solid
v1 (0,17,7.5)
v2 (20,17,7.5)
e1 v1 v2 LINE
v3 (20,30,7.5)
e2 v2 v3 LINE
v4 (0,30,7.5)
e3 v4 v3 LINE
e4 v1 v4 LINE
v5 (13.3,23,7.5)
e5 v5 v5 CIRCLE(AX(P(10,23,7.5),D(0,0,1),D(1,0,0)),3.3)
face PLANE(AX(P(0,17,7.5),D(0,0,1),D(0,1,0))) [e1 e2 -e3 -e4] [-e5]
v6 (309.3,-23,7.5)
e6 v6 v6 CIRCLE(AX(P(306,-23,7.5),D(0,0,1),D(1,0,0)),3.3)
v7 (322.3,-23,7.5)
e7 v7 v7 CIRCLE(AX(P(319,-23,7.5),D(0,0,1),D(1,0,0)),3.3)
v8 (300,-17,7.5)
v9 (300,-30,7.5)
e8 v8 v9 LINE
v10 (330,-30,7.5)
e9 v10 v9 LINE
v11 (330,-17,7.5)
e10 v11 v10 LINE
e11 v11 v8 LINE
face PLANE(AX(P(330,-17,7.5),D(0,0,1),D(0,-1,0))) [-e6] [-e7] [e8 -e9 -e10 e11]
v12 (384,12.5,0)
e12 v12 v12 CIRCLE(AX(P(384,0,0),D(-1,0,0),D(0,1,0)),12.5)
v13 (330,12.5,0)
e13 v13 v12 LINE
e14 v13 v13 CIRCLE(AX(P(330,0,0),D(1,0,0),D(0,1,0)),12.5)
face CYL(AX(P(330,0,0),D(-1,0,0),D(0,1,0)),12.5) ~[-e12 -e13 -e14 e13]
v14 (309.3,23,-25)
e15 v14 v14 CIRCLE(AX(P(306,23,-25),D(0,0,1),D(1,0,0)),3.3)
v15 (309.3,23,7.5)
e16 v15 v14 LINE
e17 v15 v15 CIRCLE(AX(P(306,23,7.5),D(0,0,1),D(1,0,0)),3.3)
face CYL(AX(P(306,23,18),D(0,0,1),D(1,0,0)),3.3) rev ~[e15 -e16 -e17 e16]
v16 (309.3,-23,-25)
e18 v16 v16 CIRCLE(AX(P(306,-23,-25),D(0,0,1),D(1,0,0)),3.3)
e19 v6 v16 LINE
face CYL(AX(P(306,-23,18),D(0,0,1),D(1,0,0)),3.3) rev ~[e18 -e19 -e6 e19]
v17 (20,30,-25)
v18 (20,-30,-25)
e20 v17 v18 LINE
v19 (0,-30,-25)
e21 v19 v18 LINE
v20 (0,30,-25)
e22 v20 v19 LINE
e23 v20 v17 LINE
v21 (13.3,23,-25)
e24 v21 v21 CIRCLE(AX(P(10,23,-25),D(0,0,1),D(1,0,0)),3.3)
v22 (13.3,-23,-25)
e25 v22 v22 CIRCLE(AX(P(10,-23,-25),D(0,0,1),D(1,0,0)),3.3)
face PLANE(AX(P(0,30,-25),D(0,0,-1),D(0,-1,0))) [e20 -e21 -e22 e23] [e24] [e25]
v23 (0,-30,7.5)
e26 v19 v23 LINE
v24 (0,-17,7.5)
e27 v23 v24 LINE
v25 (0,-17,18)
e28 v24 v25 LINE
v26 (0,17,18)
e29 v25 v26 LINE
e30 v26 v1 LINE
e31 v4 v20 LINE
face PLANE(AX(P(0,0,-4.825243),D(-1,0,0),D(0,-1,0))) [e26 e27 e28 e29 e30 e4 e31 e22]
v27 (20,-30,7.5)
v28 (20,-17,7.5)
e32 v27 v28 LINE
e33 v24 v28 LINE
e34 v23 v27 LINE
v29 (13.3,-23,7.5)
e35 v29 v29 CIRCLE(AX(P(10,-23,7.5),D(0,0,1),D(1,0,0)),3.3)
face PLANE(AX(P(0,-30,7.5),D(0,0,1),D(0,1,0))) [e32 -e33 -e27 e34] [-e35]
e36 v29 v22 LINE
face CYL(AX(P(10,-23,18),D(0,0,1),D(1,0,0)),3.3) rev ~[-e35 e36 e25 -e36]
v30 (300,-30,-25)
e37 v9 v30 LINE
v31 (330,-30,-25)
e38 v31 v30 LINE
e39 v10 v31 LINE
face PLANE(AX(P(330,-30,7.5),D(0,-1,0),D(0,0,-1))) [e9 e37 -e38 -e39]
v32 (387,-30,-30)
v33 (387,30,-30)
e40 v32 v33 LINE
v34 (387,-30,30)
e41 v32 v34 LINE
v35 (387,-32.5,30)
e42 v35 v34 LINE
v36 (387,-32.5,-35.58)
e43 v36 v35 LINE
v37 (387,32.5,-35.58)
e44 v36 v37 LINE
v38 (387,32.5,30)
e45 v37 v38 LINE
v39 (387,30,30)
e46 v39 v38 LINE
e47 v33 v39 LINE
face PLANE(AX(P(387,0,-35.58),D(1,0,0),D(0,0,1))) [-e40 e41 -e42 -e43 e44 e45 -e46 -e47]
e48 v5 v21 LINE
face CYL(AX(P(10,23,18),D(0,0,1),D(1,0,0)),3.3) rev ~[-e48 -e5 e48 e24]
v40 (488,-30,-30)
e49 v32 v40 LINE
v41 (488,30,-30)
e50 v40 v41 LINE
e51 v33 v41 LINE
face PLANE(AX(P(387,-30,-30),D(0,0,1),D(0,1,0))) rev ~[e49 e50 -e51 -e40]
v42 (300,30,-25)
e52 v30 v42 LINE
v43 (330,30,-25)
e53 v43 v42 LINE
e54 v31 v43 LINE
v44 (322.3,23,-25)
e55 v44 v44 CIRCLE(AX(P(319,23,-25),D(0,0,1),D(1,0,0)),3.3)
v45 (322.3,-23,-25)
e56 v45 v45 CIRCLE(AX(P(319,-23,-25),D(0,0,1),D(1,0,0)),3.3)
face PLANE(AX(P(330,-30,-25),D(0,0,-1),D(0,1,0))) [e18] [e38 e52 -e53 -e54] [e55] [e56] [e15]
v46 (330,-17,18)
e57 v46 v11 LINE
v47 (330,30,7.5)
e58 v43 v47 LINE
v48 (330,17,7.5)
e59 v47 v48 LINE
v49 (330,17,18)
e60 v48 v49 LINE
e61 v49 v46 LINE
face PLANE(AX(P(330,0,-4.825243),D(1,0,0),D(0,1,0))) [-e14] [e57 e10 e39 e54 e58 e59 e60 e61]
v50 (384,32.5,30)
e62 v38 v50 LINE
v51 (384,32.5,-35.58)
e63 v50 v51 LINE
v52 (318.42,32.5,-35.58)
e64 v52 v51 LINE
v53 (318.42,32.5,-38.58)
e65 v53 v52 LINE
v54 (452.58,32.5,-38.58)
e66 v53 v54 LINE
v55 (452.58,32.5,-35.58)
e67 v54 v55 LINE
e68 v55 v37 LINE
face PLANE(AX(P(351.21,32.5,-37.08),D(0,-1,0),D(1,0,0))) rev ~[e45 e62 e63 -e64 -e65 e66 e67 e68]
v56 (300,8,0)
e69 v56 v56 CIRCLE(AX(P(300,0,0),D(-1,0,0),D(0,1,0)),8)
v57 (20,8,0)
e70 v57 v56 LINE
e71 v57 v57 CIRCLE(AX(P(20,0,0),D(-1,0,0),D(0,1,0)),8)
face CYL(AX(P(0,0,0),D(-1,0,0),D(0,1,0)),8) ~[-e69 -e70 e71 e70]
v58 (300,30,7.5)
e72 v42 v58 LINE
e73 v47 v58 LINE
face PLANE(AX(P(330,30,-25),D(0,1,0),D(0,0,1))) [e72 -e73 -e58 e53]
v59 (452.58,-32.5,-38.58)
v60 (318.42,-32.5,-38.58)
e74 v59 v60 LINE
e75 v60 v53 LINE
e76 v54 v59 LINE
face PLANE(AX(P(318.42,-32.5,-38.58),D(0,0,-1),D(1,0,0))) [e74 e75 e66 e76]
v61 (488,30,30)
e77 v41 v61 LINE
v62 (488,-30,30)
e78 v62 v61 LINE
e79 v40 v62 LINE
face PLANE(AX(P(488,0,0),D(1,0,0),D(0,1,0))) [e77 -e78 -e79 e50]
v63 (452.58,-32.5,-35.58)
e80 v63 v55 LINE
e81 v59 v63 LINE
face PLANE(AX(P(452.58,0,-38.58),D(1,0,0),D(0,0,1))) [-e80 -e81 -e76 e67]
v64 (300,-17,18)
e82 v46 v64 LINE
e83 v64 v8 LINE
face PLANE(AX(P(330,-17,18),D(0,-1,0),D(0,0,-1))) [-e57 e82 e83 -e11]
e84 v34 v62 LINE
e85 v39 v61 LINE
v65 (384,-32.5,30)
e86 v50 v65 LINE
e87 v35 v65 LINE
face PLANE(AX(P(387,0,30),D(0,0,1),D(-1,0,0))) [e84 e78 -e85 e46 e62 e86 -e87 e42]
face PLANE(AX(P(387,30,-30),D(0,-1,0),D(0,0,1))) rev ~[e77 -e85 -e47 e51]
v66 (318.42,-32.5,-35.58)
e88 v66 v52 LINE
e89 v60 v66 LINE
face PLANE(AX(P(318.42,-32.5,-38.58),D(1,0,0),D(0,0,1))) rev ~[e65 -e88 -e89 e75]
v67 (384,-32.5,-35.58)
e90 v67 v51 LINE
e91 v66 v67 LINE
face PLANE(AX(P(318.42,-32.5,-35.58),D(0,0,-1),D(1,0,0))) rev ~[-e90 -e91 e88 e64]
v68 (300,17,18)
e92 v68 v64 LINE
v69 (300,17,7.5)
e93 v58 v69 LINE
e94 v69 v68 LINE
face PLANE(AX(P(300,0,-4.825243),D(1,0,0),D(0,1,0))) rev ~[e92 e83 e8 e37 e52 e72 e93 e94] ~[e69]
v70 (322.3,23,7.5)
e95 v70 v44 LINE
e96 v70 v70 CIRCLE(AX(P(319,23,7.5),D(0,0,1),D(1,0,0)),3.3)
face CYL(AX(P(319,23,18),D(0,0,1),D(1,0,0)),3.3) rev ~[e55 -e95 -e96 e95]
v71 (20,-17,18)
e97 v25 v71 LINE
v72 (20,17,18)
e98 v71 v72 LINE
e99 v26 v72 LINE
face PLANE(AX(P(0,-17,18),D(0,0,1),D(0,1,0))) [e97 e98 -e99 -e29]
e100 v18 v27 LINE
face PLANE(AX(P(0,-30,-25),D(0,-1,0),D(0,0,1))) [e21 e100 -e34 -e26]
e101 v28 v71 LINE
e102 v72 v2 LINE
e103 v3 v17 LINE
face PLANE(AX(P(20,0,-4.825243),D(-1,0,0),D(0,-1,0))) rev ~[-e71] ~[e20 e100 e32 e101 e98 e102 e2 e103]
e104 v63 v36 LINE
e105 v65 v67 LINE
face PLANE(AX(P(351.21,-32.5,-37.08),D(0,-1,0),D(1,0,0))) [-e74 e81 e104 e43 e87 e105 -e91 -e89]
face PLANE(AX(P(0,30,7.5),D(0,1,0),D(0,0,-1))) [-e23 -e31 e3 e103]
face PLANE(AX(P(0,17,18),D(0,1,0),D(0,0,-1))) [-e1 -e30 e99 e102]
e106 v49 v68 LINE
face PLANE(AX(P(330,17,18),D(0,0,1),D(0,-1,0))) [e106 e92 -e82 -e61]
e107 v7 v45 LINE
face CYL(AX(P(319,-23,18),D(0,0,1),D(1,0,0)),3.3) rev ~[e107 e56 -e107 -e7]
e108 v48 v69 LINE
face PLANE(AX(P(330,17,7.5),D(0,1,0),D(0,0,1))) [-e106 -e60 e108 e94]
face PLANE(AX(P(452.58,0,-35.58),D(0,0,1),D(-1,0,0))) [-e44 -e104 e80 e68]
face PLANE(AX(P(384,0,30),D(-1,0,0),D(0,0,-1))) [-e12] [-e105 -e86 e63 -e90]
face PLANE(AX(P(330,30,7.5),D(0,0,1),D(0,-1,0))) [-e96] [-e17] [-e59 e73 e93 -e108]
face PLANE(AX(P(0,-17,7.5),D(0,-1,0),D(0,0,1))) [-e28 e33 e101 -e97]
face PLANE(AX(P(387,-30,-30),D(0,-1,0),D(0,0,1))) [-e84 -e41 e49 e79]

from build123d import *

# Parameters (mm, degrees)
F0_R      = 8
F1_DEPTH  = 330
F3_DEPTH  = 30
F5_DEPTH  = 20
F6_R      = 12.5
F7_DEPTH  = 57
F8_R      = 3.3
F9_DEPTH  = 43.001
F10_W     = 60
F10_H     = 60
F11_DEPTH = 101
F13_DEPTH = 32.5
F14_W     = 65.58
F14_H     = 3
F15_DEPTH = 65


# Not quite as in the source:
# - a feature names something its author has since deleted; it is built from what else it names


with BuildPart() as f1:
    # F0 (on Right) → F1 (new body)
    with BuildSketch(Plane.YZ):
        Circle(F0_R)
    extrude(amount=F1_DEPTH)

    # F2 (on face) → F3 (join)
    with BuildSketch(Plane.YZ.offset(330)):
        Polygon((30, 7.5), (17, 7.5), (17, 18), (-17, 18), (-17, 7.5), (-30, 7.5), (-30, -25), (30, -25), align=None)
    extrude(amount=-F3_DEPTH)

    # F4 (on face) → F5 (join)
    with BuildSketch(Plane(origin=(0, 0, 0), x_dir=(0, -1, 0), z_dir=(-1, 0, 0))):
        Polygon((17, 7.5), (17, 18), (-17, 18), (-17, 7.5), (-30, 7.5), (-30, -25), (30, -25), (30, 7.5), align=None)
    extrude(amount=-F5_DEPTH)

    # F6 (on face) → F7 (join)
    with BuildSketch(Plane.YZ.offset(330)):
        Circle(F6_R)
    extrude(amount=F7_DEPTH)

    # F8 (on face) → F9 (cut, through all)
    with BuildSketch(Plane.XY.offset(18)):
        with Locations((306, 23)):
            Circle(F8_R)
        with Locations((319, 23)):
            Circle(F8_R)
        with Locations((306, -23)):
            Circle(F8_R)
        with Locations((319, -23)):
            Circle(F8_R)
        with Locations((10, 23)):
            Circle(F8_R)
        with Locations((10, -23)):
            Circle(F8_R)
    extrude(amount=-F9_DEPTH, mode=Mode.SUBTRACT)

    # F10 (on face) → F11 (join)
    with BuildSketch(Plane.YZ.offset(387)):
        Rectangle(F10_W, F10_H)
    extrude(amount=F11_DEPTH)

    # F12 (on Front) → F13 (join, symmetric)
    with BuildSketch(Plane.XZ):
        Polygon((387, 30), (384, 30), (384, -38.58), (452.58, -38.58), (452.58, -35.58), (387, -35.58), align=None)
    extrude(amount=F13_DEPTH, both=True)

    # F14 (on face) → F15 (join, through all)
    with BuildSketch(Plane.XZ.offset(32.5)):
        with Locations((351.21, -37.08)):
            Rectangle(F14_W, F14_H)
    extrude(amount=-F15_DEPTH)


solid = f1.part
